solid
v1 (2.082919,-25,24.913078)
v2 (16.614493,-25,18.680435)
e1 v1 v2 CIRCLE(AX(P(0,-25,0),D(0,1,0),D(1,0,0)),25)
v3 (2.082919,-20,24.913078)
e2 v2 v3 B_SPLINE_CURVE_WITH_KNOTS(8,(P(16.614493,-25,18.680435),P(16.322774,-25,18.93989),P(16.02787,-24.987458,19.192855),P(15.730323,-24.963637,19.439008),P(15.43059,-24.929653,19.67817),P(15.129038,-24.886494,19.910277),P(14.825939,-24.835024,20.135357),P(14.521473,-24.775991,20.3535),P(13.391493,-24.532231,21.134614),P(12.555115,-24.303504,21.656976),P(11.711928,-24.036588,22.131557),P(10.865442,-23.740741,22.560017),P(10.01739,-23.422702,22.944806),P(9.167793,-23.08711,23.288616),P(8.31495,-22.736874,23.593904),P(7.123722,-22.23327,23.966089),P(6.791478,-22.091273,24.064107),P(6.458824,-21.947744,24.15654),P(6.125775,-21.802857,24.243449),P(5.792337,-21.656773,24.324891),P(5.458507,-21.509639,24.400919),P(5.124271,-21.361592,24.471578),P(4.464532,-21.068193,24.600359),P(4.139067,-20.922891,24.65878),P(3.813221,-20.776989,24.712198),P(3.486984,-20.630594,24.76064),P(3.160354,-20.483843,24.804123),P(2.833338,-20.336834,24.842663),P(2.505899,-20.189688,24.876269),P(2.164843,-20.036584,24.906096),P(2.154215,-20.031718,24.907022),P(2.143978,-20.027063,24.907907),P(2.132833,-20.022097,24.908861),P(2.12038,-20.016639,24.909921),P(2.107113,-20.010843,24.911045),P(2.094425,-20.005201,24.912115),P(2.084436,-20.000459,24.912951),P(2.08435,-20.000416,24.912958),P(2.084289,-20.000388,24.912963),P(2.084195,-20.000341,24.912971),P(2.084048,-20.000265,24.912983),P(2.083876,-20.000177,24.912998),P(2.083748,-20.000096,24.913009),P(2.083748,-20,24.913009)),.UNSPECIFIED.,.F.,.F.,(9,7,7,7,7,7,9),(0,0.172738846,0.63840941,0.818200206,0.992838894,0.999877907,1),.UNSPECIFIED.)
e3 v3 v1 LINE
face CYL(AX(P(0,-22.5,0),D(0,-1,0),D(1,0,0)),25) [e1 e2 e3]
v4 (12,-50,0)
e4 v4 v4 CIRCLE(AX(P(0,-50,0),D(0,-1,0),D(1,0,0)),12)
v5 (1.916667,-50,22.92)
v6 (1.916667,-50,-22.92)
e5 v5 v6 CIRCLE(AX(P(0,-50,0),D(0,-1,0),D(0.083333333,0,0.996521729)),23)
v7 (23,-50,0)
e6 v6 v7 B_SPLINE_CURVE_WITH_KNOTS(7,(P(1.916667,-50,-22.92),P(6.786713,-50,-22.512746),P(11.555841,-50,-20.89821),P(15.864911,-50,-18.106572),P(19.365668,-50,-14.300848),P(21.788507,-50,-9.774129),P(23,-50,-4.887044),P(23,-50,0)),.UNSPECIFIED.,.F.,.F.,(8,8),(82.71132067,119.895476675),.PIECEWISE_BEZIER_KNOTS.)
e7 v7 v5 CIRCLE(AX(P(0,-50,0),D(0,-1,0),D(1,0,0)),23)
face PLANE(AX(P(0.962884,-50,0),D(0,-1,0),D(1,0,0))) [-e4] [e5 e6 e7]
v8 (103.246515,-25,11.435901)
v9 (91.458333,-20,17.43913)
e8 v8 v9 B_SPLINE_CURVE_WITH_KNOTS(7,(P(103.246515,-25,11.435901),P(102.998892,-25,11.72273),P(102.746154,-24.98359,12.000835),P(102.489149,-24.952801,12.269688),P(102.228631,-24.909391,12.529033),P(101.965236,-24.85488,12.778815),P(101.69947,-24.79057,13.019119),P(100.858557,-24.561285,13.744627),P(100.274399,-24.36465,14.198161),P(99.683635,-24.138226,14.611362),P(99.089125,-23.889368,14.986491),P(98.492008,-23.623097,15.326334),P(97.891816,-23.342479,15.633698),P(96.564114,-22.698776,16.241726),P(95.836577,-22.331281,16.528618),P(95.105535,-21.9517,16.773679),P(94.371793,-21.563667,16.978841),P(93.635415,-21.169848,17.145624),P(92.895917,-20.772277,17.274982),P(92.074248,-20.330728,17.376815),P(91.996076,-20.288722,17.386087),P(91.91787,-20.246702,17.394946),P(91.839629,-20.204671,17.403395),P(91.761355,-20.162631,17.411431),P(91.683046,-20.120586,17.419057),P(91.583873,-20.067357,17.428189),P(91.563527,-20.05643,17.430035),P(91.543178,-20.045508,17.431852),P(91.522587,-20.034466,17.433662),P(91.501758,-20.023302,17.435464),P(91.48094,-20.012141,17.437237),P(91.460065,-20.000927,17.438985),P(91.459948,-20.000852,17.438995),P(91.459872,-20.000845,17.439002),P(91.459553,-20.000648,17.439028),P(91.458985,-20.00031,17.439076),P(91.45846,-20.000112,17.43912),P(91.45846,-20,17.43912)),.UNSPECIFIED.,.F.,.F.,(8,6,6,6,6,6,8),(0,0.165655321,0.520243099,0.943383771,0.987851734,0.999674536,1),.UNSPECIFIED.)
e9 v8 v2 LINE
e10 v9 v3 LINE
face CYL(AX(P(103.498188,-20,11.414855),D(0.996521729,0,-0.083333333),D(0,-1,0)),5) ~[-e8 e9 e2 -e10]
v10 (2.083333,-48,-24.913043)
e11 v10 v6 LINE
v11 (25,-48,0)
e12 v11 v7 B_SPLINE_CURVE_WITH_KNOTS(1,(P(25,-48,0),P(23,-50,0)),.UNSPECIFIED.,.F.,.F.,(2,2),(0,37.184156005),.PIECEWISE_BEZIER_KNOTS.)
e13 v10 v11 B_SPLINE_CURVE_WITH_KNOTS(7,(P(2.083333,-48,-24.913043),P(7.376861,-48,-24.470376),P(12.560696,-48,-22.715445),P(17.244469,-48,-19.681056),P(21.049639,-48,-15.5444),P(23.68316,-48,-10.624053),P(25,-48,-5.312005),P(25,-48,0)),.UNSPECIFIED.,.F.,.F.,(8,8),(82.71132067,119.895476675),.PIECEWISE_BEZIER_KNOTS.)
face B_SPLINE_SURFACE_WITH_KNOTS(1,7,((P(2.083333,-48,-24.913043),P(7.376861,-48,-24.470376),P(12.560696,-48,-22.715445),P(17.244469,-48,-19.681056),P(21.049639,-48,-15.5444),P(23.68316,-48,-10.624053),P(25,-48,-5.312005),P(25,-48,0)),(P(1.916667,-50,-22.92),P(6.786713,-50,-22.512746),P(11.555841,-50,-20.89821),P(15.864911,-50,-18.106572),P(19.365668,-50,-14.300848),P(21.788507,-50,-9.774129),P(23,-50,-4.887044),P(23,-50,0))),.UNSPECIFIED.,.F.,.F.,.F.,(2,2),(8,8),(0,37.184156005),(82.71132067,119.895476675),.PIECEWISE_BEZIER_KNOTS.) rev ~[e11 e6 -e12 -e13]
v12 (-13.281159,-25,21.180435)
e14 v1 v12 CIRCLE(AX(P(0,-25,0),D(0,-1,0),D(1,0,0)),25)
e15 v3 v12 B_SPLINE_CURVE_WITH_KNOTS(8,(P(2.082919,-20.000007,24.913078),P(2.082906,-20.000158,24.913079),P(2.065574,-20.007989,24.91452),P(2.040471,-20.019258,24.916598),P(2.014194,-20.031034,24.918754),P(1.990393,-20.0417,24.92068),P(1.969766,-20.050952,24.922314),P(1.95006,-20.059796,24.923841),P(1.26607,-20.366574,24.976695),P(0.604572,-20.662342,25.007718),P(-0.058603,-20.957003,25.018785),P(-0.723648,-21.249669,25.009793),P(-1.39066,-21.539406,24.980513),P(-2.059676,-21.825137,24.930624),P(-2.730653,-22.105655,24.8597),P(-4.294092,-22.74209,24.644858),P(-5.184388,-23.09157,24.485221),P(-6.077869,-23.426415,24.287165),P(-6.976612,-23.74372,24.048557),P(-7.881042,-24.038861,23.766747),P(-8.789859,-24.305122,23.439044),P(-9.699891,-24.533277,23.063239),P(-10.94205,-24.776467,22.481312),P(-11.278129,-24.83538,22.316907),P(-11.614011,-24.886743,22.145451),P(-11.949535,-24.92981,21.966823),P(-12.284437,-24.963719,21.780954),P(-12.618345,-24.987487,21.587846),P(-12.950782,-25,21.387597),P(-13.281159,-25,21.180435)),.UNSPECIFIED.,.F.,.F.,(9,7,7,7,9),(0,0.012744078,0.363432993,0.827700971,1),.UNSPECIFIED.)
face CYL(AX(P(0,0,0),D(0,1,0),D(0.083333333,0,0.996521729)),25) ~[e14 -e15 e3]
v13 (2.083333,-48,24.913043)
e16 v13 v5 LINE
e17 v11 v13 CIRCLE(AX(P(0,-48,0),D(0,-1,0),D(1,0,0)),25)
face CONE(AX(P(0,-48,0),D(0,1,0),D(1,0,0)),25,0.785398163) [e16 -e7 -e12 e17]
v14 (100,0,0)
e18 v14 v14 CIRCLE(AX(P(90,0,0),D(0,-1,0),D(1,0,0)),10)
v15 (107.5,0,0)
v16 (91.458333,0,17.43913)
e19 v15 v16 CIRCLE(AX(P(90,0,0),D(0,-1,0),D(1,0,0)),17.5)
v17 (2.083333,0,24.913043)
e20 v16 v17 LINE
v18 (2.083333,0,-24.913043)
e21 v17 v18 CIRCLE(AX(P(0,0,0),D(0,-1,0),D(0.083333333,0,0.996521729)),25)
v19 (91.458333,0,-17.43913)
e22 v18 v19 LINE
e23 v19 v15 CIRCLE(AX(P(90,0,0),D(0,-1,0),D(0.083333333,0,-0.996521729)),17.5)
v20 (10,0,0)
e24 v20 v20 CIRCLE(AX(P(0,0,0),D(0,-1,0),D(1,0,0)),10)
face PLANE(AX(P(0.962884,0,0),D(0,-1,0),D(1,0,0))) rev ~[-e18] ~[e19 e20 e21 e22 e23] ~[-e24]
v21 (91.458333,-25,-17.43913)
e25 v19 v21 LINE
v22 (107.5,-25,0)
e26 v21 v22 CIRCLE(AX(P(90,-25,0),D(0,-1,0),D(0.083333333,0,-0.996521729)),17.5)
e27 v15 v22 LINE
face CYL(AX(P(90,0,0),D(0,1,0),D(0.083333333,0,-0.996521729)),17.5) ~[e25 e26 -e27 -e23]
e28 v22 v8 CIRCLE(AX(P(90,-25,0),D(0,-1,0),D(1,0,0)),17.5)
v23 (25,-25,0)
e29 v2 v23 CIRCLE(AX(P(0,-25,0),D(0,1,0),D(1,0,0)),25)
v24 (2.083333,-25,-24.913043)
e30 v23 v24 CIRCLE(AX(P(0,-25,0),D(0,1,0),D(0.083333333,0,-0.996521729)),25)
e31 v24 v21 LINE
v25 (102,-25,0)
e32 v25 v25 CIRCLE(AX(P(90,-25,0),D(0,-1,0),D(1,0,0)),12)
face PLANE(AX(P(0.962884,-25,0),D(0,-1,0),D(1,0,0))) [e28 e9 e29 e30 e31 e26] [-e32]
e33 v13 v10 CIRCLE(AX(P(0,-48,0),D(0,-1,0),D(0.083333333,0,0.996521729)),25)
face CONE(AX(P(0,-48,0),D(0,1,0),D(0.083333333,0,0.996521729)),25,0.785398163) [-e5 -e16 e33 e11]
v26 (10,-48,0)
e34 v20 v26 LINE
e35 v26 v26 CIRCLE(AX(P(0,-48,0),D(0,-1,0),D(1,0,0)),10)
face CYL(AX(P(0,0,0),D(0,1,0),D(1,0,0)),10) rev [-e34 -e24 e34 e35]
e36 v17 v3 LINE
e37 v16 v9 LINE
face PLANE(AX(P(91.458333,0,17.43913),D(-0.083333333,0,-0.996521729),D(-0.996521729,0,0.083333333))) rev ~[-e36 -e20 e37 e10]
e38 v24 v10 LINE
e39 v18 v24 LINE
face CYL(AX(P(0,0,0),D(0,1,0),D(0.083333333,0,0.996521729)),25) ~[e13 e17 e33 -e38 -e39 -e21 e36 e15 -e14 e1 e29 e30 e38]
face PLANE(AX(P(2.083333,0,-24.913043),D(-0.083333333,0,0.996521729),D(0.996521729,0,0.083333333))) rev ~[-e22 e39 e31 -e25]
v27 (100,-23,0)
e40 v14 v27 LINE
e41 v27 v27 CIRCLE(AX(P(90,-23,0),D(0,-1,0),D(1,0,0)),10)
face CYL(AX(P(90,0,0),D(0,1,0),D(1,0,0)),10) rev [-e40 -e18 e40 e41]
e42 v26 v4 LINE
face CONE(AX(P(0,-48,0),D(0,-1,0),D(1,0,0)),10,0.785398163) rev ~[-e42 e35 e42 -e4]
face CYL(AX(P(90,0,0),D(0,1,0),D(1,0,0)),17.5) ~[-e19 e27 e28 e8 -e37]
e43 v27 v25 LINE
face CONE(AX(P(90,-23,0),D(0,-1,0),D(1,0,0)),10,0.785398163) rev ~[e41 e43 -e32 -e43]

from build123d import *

# Parameters (mm, degrees)
F0_R        = 10
F1_DEPTH    = 25
F2_DEPTH    = 50
F3_SIZE     = 2
F4_T4_DEPTH = 123.4369555733
F4_S5_R     = 25
F4_T6_DEPTH = 64


# Not quite as in the source:
# - a fillet or chamfer that OpenCascade refuses, or shapes differently, is made with other operations: its cross-section is extruded or revolved along the edge and cut away or added


with BuildPart() as f1:
    # F0 (on Front) → F1 (new body)
    with BuildSketch(Plane.XZ):
        with BuildLine():
            ThreePointArc((2.0833333333, -24.9130432148), (18.3995018048, -16.9250800097), (25, 0))
            ThreePointArc((25, 0), (18.3995018048, 16.9250800097), (2.0833333333, 24.9130432148))
            ThreePointArc((2.0833333333, 24.9130432148), (-25, 0), (2.0833333333, -24.9130432148))
        make_face()
        Circle(F0_R, mode=Mode.SUBTRACT)
        with BuildLine():
            ThreePointArc((2.0833333333, 24.9130432148), (18.3995018048, 16.9250800097), (25, 0))
            ThreePointArc((25, 0), (18.3995018048, -16.9250800097), (2.0833333333, -24.9130432148))
            Line((2.0833333333, -24.9130432148), (91.4583333333, -17.4391302504))
            ThreePointArc((91.4583333333, -17.4391302504), (72.5, 0), (91.4583333333, 17.4391302504))
            Line((91.4583333333, 17.4391302504), (2.0833333333, 24.9130432148))
        make_face()
        with BuildLine():
            ThreePointArc((107.5, 0), (102.8796512634, 11.8475560068), (91.4583333333, 17.4391302504))
            ThreePointArc((91.4583333333, 17.4391302504), (72.5, 0), (91.4583333333, -17.4391302504))
            ThreePointArc((91.4583333333, -17.4391302504), (102.8796512634, -11.8475560068), (107.5, 0))
        make_face()
        with Locations((90, 0)):
            Circle(F0_R, mode=Mode.SUBTRACT)
    extrude(amount=F1_DEPTH)

    # F0 (on Front) → F2 (join)
    with BuildSketch(Plane.XZ):
        with BuildLine():
            ThreePointArc((2.0833333333, -24.9130432148), (18.3995018048, -16.9250800097), (25, 0))
            ThreePointArc((25, 0), (18.3995018048, 16.9250800097), (2.0833333333, 24.9130432148))
            ThreePointArc((2.0833333333, 24.9130432148), (-25, 0), (2.0833333333, -24.9130432148))
        make_face()
        Circle(F0_R, mode=Mode.SUBTRACT)
    extrude(amount=F2_DEPTH)

    # F3
    f3_edges = [f1.edges().sort_by_distance(p)[0] for p in [
        (-2.083333, -50, 24.913043),
        (-10, -50, 0),
        (80, -25, 0),
    ]]
    chamfer(f3_edges, length=F3_SIZE)

    # F4: fillet of radius 5 on 1 edges, made by hand


with BuildPart() as f4_tool2:
    # F4_s3 → F4_t4 (new body)
    with BuildSketch(Plane(origin=(101.8315216074, 0, -8.5155796311), x_dir=(0, 1, 0), z_dir=(-0.9965217286, 0, 0.0833333333))):
        with BuildLine():
            ThreePointArc((-25, -20), (-23.5355339059, -23.5355339059), (-20, -25))
            Line((-20, -25), (-25, -25))
            Line((-25, -25), (-25, -20))
        make_face()
    extrude(amount=F4_T4_DEPTH)

    # F4_s5 → F4_t6 (cut, symmetric)
    with BuildSketch(Plane.XZ.offset(22.5)):
        Circle(F4_S5_R)
    extrude(amount=F4_T6_DEPTH, both=True, mode=Mode.SUBTRACT)


with BuildPart() as f1_1:
    add(f1.part)

    # F4_t1: cut F4_tool2
    add(f4_tool2.part, mode=Mode.SUBTRACT)


solid = f1_1.part
